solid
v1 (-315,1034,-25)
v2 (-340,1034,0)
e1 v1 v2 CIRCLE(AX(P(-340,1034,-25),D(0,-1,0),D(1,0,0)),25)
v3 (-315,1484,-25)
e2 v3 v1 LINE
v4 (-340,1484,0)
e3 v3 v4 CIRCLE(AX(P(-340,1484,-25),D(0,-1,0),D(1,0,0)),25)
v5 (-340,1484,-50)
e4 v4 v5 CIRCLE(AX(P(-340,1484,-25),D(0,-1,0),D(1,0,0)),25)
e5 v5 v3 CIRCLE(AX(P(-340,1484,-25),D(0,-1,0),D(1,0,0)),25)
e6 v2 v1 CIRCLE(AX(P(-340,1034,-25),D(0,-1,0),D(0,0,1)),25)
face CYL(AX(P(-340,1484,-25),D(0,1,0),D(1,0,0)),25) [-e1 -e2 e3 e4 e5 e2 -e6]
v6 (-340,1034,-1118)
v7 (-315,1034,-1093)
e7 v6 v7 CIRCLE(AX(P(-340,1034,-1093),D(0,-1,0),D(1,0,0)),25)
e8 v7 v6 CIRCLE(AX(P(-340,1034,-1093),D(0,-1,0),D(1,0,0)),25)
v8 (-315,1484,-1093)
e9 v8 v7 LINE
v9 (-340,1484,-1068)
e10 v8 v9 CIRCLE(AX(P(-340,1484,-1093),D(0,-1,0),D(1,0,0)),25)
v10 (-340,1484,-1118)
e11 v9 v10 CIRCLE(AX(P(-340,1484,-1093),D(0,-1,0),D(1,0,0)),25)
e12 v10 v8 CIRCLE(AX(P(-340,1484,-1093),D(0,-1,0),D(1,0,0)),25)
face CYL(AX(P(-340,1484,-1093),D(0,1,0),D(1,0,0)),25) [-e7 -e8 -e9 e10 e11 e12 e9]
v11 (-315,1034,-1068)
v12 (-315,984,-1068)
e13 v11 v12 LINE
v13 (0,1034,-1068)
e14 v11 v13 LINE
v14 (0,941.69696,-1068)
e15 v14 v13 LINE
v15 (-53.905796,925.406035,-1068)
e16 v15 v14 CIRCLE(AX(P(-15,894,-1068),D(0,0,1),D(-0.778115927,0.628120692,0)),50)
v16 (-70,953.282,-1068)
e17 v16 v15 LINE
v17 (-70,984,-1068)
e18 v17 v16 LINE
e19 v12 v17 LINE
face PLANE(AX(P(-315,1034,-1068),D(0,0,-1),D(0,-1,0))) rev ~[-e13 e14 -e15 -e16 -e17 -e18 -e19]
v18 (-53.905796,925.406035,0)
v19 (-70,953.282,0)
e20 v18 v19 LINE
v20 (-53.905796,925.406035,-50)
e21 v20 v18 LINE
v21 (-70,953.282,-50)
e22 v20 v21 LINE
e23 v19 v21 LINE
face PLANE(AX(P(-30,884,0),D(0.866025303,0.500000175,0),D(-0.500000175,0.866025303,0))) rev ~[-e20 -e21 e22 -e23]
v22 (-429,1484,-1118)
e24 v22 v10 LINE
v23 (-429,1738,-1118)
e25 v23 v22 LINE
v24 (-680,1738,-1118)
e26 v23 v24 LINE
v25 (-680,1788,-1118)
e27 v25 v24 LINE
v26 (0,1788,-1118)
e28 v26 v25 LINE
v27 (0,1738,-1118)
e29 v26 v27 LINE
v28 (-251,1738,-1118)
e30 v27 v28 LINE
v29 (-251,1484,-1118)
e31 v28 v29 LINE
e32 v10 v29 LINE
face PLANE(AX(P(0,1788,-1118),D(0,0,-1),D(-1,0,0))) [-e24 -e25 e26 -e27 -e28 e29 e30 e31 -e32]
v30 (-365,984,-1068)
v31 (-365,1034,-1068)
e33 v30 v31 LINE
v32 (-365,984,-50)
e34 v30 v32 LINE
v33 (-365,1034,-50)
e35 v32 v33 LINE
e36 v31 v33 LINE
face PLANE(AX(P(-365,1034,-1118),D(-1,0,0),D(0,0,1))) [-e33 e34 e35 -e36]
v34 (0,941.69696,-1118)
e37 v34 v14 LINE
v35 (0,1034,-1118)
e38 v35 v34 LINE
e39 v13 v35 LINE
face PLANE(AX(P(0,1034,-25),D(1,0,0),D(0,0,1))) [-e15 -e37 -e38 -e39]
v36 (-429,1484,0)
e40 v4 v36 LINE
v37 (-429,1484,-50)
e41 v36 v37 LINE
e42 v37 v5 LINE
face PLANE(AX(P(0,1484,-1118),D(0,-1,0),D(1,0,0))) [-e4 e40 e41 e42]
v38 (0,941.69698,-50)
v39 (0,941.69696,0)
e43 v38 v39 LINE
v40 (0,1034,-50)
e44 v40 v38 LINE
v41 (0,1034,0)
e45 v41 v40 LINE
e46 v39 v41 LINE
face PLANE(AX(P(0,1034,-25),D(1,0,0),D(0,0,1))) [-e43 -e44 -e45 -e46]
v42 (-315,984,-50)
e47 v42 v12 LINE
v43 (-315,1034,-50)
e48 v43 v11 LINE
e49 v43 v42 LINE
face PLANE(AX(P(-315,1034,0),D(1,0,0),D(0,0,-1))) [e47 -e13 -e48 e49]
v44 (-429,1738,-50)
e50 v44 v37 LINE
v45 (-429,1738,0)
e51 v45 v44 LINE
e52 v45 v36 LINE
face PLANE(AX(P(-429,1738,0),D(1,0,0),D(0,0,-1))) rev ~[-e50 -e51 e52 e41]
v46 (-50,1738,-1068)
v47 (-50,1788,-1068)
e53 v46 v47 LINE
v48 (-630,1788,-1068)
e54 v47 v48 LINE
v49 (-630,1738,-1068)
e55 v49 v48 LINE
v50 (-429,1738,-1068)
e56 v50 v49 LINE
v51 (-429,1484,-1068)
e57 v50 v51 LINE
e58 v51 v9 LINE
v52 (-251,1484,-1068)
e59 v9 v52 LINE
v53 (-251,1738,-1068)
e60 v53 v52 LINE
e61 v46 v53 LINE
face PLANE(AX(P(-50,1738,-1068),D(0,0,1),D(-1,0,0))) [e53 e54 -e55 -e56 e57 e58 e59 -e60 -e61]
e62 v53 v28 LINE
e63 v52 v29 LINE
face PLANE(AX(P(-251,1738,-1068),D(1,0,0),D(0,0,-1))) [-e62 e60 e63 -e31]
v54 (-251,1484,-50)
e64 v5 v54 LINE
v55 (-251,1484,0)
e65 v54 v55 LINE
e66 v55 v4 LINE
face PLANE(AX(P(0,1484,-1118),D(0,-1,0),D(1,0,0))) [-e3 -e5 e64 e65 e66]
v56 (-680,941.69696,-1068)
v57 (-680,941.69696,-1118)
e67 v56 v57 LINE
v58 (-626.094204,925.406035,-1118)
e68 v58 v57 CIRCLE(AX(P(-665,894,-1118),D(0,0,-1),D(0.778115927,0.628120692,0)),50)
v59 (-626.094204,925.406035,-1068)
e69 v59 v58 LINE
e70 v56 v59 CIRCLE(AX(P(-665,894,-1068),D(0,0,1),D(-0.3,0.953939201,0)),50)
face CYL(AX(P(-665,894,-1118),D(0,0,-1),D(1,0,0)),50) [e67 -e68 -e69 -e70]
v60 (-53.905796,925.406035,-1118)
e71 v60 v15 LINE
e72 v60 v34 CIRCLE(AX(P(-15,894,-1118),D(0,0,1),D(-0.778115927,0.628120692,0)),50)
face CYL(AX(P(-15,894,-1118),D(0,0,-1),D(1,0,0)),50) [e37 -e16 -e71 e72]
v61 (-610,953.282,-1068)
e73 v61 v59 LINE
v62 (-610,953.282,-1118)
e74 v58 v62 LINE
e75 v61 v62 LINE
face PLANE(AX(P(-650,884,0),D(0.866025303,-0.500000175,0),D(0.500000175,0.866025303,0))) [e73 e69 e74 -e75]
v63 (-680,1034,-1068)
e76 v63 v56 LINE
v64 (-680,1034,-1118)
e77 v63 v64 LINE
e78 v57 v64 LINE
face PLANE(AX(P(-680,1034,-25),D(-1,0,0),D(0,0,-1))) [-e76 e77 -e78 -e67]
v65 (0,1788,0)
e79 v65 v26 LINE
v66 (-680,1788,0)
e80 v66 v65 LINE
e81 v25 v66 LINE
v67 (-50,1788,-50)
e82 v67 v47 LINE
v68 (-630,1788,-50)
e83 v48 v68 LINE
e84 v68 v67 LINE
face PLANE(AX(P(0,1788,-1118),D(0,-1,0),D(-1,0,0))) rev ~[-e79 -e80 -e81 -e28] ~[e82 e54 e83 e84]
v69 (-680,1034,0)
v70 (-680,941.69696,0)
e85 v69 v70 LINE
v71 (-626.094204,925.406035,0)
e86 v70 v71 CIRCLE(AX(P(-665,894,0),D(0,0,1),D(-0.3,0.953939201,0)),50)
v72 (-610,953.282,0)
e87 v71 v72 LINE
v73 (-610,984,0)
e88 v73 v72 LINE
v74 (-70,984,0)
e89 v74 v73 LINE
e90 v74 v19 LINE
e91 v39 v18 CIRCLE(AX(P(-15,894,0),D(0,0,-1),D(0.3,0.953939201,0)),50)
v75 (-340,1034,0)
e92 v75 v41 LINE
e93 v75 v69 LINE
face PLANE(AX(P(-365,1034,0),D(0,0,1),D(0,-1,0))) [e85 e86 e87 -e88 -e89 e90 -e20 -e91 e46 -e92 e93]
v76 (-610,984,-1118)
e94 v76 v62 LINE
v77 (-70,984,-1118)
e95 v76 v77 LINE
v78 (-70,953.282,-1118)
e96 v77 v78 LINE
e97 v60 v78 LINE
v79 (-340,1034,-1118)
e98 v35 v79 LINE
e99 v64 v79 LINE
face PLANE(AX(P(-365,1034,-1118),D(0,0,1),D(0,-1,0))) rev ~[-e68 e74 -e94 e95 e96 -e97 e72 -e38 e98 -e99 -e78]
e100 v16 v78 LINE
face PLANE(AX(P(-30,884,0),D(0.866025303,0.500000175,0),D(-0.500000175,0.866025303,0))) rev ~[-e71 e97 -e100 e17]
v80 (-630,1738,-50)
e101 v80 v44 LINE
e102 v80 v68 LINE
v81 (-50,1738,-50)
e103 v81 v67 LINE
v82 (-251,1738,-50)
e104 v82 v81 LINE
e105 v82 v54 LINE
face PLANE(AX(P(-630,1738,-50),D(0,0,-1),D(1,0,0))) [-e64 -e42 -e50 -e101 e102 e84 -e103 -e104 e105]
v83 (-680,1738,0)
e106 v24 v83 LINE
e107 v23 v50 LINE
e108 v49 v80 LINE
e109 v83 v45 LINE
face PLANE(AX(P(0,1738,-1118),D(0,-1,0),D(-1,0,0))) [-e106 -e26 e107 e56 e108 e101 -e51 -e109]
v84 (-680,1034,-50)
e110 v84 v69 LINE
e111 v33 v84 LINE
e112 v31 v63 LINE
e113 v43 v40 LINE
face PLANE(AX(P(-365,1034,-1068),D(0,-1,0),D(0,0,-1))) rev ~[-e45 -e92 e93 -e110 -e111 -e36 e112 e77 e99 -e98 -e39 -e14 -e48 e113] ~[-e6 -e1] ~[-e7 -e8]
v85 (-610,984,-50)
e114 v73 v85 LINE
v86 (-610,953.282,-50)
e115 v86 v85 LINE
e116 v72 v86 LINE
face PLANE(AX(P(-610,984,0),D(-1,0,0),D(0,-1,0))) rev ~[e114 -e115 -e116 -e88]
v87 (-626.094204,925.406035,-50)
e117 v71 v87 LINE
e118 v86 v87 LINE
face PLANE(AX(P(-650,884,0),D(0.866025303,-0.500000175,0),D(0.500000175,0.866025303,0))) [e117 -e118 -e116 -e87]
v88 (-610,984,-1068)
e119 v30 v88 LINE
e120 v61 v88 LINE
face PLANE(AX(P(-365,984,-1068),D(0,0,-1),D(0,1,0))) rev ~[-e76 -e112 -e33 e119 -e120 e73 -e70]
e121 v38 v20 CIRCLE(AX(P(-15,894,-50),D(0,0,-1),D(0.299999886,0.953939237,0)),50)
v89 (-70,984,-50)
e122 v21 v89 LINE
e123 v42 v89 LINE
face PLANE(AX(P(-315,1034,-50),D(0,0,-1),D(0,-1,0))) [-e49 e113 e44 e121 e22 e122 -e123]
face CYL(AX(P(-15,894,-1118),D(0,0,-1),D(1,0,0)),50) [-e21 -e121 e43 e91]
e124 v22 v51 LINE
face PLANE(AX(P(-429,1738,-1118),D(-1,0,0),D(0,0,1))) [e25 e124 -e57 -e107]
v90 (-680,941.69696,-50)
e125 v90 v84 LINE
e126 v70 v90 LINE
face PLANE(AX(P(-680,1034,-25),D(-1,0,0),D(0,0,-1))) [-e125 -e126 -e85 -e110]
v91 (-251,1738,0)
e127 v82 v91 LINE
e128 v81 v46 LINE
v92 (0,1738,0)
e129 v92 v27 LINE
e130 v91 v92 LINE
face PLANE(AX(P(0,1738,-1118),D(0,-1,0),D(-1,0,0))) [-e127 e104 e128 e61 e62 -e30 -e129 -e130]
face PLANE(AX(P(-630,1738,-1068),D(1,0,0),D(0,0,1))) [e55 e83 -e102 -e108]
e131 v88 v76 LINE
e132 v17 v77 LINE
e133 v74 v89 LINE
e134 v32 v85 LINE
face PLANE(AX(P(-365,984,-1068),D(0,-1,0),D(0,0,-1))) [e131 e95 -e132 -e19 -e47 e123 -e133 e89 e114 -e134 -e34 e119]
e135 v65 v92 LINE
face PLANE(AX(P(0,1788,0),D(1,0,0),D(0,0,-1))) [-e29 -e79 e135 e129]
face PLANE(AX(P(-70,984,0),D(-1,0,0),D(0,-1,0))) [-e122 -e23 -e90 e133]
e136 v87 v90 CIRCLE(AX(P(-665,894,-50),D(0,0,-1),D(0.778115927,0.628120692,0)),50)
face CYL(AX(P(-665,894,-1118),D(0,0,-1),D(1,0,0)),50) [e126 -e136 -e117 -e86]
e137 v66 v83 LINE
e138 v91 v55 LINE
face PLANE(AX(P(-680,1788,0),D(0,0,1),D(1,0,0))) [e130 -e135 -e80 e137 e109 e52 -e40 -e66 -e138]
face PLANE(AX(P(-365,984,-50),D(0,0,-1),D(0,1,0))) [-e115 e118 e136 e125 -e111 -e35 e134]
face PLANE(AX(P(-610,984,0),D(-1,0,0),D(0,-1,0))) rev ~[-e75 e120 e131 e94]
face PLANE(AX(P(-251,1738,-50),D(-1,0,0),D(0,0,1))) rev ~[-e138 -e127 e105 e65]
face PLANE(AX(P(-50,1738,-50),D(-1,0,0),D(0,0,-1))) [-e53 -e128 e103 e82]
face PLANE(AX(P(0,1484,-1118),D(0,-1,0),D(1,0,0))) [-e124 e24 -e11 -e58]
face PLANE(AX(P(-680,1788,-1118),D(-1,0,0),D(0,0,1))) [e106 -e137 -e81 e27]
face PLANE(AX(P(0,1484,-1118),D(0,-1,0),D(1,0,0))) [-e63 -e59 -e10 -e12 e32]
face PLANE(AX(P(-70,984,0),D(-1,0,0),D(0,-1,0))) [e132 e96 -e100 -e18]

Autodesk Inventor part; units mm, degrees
ref_plane "YZ Plane" through (0, 0, 0) normal (1, 0, 0) x (0, 1, 0)
ref_plane "XZ Plane" through (0, 0, 0) normal (0, 1, 0) x (-1, 0, 0)
ref_plane "XY Plane" through (0, 0, 0) normal (0, 0, 1) x (1, 0, 0)
sketch "Sketch1" plane through (0, 0, 0) normal (0, 1, 0) x (-1, 0, 0)
  line L0 (0, 0) -> (680, 0)
  line L1 (680, 0) -> (680, -1118)
  line L2 (680, -1118) -> (0, -1118)
  line L3 (0, -1118) -> (0, 0)
  dimension "d0" = 680
  dimension "d1" = 1118
extrude "Extrusion1" add sketch "Sketch1" along normal blind 50
sketch "Sketch2" plane through (0, 50, 0) normal (0, 1, 0) x (1, 0, 0)
  line L0 (-50, 50) -> (-630, 50)
  line L1 (-630, 50) -> (-630, 1068)
  line L2 (-630, 1068) -> (-50, 1068)
  line L3 (-50, 1068) -> (-50, 50)
  point P0 (0, 0)
  dimension "d4" = 580
  dimension "d5" = 1018
extrude "Extrusion2" cut sketch "Sketch2" against normal blind 50
sketch "Sketch3" plane through (0, 50, 0) normal (0, 1, 0) x (1, 0, 0)
  point P0 (0, 0)
sketch "Sketch4" plane through (0, 50, 0) normal (0, 1, 0) x (1, 0, 0)
  line L0 (-680, 0) -> (0, 0) projected
  line L1 (-251, 0) -> (-429, 0)
  line L2 (-429, 0) -> (-429, 50)
  line L3 (-429, 50) -> (-251, 50)
  line L4 (-251, 50) -> (-251, 0)
  dimension "d8" = 178
  dimension "d9" = 50
extrude "Extrusion3" add sketch "Sketch4" along normal blind 254
sketch "Sketch5" plane through (0, 50, 0) normal (0, 1, 0) x (1, 0, 0)
  line L0 (0, 1118) -> (-680, 1118) projected
  line L1 (-630, 1068) -> (-50, 1068) projected
  line L2 (-251, 1118) -> (-429, 1118)
  line L3 (-429, 1118) -> (-429, 1068)
  line L4 (-429, 1068) -> (-251, 1068)
  line L5 (-251, 1068) -> (-251, 1118)
  point P0 (0, 0)
  dimension "d12" = 178
extrude "Extrusion4" add sketch "Sketch5" along normal blind 254
sketch "Sketch6" plane through (0, 304, 0) normal (0, 1, 0) x (1, 0, 0)
  circle A0 centre (-340, 25) radius 25
  point P0 (0, 0)
  dimension "d15" = 50
extrude "Extrusion5" add sketch "Sketch6" along normal blind 450
sketch "Sketch7" plane through (0, 304, 0) normal (0, 1, 0) x (1, 0, 0)
  circle A0 centre (-340, 1093) radius 25
  point P0 (0, 0)
  dimension "d18" = 50
extrude "Extrusion6" add sketch "Sketch7" along normal blind 450
sketch "Sketch8" plane through (-340, 754, -25) normal (0, 1, 0) x (1, 0, 0)
  line L0 (-340, -25) -> (340, -25) projected
  line L1 (25, -25) -> (-25, -25)
  line L2 (-25, -25) -> (-25, 1093)
  line L3 (-25, 1093) -> (25, 1093)
  line L4 (25, 1093) -> (25, -25)
  dimension "d21" = 50
  dimension "d22" = 1118
extrude "Extrusion7" add sketch "Sketch8" along normal blind 50
sketch "Sketch9" plane through (-315, 754, -25) normal (1, 0, 0) x (0, 0, -1)
  line L0 (0, 0) -> (-25, 0) projected
  line L1 (-25, 0) -> (25, 0)
  line L2 (25, 0) -> (25, 50)
  line L3 (25, 50) -> (-25, 50)
  line L4 (-25, 50) -> (-25, 0)
  point P0 (-25, -754)
  dimension "d25" = 50
  dimension "d26" = 50
extrude "Extrusion8" add sketch "Sketch9" along normal blind 315
sketch "Sketch10" plane through (-315, 754, -1093) normal (1, 0, 0) x (0, 0, -1)
  line L0 (25, 0) -> (25, 50) projected
  line L1 (25, 0) -> (-25, 0)
  line L2 (-25, 0) -> (-25, 50)
  line L3 (-25, 50) -> (25, 50)
  line L4 (25, 50) -> (25, 0)
  point P0 (-1093, -754)
  dimension "d29" = 50
  dimension "d30" = 50
extrude "Extrusion9" add sketch "Sketch10" along normal blind 315
sketch "Sketch11" plane through (-365, 754, -1093) normal (-1, 0, 0) x (0, 0, 1)
  line L0 (-25, 50) -> (1093, 50) projected
  line L1 (-25, 50) -> (25, 50)
  line L2 (25, 50) -> (25, 0)
  line L3 (25, 0) -> (-25, 0)
  line L4 (-25, 0) -> (-25, 50)
  point P0 (1093, -754)
  dimension "d33" = 50
  dimension "d34" = 50
extrude "Extrusion10" add sketch "Sketch11" along normal blind 315
sketch "Sketch12" plane through (-365, 754, -25) normal (-1, 0, 0) x (0, 0, 1)
  line L0 (-1043, 50) -> (25, 50) projected
  line L1 (25, 50) -> (-25, 50)
  line L2 (-25, 50) -> (-25, 0)
  line L3 (-25, 0) -> (25, 0)
  line L4 (25, 0) -> (25, 50)
  point P0 (25, -754)
  dimension "d37" = 50
  dimension "d38" = 50
extrude "Extrusion11" add sketch "Sketch12" along normal blind 315
sketch "Sketch13" plane through (0, 754, -1118) normal (0, 0, -1) x (-1, 0, 0)
  line L0 (680, 0) -> (680, 50) projected
  line L1 (680, 50) -> (610, 50)
  line L2 (610, 50) -> (610, 80.718)
  line L3 (650, 150) -> (680, 150)
  line L4 (680, 150) -> (680, 50)
  line L5 (0, 50) -> (70, 50)
  line L6 (70, 50) -> (70, 80.718)
  line L7 (30, 150) -> (0, 150)
  line L8 (0, 150) -> (0, 50)
  line L9 (650, 150) -> (610, 80.718)
  line L10 (650, 150) -> (680, 150) construction
  line L11 (30, 150) -> (70, 80.718)
  point P0 (0, -754)
extrude "Extrusion12" add sketch "Sketch13" against normal blind 1118
sketch "Sketch14" plane through (0, 754, -25) normal (1, 0, 0) x (0, 0, -1)
  line L0 (25, 50) -> (1043, 50) projected
  line L1 (1043, 50) -> (25, 50)
  line L2 (25, 50) -> (25, 150)
  line L3 (25, 150) -> (1043, 150)
  line L4 (1043, 150) -> (1043, 50)
  point P0 (-25, -754)
extrude "Extrusion13" cut sketch "Sketch14" against normal blind 1118
sketch "Sketch15" plane through (-340, 754, 0) normal (0, 0, 1) x (1, 0, 0)
  circle A0 centre (325, 140) radius 50
  circle A1 centre (-325, 140) radius 50
  line L0 (340, 0) -> (340, 150) projected
  line L1 (340, 0) -> (340, 150) projected
  line L2 (0, 0) -> (-340, 0) projected
  line L3 (0, 0) -> (340, 0) projected
  line L4 (340, 0) -> (340, 150) projected
  line L5 (340, 150) -> (310, 150) projected
  line L6 (310, 150) -> (270, 80.718) projected
  line L7 (270, 80.718) -> (270, 50) projected
  line L8 (270, 50) -> (-270, 50) projected
  line L9 (-270, 50) -> (-270, 80.718) projected
  line L10 (-270, 80.718) -> (-310, 150) projected
  line L11 (-310, 150) -> (-340, 150) projected
  line L12 (-340, 0) -> (-340, 150) projected
  point P0 (340, -754)
  point P1 (340, 92.303)
  point P2 (286.0942, 108.594)
extrude "Extrusion14" add sketch "Sketch15" against normal blind 1118 contours A0 L0 L5 L6 | L12 L11 L10 A1 | A1 L10 L11 L12 picked at (325.7082, 163.3183)
move or copy body "Rotate1" bodies to move or copy 1 copy no rotation origin (0, 0, 0) rotation axis (1, 0, 0) rotation angle 180 translate (0, 1788, -1118)
sketch "Sketch16" plane through (0, 1034, 0) normal (1, 0, 0) x (0, 0, -1)
  line L0 (50, 0) -> (50, -92.303) projected
  line L1 (50, -72.2577) -> (1068, -72.2577)
  line L2 (1068, -72.2577) -> (1068, -234.0796)
  line L3 (1068, -234.0796) -> (50, -234.0796)
  line L4 (50, -234.0796) -> (50, -72.2577)
  point P0 (0, -1034)
  dimension "d58" = 1018
extrude "Extrusion15" cut sketch "Sketch16" against normal blind 1118
sketch "Sketch17" plane through (-680, 1034, -1118) normal (-1, 0, 0) x (0, 0, 1)
  line L0 (1118, -80.718) -> (1068, -80.718) projected
  line L1 (1068, -80.718) -> (50, -80.718)
  line L2 (50, -80.718) -> (50, -329.635)
  line L3 (50, -329.635) -> (1068, -329.635)
  line L4 (1068, -329.635) -> (1068, -80.718)
  point P0 (1118, -1034)
  dimension "d61" = 1018
extrude "Extrusion16" cut sketch "Sketch17" against normal blind 1118
properties part number "Human-Subject-Cart"
